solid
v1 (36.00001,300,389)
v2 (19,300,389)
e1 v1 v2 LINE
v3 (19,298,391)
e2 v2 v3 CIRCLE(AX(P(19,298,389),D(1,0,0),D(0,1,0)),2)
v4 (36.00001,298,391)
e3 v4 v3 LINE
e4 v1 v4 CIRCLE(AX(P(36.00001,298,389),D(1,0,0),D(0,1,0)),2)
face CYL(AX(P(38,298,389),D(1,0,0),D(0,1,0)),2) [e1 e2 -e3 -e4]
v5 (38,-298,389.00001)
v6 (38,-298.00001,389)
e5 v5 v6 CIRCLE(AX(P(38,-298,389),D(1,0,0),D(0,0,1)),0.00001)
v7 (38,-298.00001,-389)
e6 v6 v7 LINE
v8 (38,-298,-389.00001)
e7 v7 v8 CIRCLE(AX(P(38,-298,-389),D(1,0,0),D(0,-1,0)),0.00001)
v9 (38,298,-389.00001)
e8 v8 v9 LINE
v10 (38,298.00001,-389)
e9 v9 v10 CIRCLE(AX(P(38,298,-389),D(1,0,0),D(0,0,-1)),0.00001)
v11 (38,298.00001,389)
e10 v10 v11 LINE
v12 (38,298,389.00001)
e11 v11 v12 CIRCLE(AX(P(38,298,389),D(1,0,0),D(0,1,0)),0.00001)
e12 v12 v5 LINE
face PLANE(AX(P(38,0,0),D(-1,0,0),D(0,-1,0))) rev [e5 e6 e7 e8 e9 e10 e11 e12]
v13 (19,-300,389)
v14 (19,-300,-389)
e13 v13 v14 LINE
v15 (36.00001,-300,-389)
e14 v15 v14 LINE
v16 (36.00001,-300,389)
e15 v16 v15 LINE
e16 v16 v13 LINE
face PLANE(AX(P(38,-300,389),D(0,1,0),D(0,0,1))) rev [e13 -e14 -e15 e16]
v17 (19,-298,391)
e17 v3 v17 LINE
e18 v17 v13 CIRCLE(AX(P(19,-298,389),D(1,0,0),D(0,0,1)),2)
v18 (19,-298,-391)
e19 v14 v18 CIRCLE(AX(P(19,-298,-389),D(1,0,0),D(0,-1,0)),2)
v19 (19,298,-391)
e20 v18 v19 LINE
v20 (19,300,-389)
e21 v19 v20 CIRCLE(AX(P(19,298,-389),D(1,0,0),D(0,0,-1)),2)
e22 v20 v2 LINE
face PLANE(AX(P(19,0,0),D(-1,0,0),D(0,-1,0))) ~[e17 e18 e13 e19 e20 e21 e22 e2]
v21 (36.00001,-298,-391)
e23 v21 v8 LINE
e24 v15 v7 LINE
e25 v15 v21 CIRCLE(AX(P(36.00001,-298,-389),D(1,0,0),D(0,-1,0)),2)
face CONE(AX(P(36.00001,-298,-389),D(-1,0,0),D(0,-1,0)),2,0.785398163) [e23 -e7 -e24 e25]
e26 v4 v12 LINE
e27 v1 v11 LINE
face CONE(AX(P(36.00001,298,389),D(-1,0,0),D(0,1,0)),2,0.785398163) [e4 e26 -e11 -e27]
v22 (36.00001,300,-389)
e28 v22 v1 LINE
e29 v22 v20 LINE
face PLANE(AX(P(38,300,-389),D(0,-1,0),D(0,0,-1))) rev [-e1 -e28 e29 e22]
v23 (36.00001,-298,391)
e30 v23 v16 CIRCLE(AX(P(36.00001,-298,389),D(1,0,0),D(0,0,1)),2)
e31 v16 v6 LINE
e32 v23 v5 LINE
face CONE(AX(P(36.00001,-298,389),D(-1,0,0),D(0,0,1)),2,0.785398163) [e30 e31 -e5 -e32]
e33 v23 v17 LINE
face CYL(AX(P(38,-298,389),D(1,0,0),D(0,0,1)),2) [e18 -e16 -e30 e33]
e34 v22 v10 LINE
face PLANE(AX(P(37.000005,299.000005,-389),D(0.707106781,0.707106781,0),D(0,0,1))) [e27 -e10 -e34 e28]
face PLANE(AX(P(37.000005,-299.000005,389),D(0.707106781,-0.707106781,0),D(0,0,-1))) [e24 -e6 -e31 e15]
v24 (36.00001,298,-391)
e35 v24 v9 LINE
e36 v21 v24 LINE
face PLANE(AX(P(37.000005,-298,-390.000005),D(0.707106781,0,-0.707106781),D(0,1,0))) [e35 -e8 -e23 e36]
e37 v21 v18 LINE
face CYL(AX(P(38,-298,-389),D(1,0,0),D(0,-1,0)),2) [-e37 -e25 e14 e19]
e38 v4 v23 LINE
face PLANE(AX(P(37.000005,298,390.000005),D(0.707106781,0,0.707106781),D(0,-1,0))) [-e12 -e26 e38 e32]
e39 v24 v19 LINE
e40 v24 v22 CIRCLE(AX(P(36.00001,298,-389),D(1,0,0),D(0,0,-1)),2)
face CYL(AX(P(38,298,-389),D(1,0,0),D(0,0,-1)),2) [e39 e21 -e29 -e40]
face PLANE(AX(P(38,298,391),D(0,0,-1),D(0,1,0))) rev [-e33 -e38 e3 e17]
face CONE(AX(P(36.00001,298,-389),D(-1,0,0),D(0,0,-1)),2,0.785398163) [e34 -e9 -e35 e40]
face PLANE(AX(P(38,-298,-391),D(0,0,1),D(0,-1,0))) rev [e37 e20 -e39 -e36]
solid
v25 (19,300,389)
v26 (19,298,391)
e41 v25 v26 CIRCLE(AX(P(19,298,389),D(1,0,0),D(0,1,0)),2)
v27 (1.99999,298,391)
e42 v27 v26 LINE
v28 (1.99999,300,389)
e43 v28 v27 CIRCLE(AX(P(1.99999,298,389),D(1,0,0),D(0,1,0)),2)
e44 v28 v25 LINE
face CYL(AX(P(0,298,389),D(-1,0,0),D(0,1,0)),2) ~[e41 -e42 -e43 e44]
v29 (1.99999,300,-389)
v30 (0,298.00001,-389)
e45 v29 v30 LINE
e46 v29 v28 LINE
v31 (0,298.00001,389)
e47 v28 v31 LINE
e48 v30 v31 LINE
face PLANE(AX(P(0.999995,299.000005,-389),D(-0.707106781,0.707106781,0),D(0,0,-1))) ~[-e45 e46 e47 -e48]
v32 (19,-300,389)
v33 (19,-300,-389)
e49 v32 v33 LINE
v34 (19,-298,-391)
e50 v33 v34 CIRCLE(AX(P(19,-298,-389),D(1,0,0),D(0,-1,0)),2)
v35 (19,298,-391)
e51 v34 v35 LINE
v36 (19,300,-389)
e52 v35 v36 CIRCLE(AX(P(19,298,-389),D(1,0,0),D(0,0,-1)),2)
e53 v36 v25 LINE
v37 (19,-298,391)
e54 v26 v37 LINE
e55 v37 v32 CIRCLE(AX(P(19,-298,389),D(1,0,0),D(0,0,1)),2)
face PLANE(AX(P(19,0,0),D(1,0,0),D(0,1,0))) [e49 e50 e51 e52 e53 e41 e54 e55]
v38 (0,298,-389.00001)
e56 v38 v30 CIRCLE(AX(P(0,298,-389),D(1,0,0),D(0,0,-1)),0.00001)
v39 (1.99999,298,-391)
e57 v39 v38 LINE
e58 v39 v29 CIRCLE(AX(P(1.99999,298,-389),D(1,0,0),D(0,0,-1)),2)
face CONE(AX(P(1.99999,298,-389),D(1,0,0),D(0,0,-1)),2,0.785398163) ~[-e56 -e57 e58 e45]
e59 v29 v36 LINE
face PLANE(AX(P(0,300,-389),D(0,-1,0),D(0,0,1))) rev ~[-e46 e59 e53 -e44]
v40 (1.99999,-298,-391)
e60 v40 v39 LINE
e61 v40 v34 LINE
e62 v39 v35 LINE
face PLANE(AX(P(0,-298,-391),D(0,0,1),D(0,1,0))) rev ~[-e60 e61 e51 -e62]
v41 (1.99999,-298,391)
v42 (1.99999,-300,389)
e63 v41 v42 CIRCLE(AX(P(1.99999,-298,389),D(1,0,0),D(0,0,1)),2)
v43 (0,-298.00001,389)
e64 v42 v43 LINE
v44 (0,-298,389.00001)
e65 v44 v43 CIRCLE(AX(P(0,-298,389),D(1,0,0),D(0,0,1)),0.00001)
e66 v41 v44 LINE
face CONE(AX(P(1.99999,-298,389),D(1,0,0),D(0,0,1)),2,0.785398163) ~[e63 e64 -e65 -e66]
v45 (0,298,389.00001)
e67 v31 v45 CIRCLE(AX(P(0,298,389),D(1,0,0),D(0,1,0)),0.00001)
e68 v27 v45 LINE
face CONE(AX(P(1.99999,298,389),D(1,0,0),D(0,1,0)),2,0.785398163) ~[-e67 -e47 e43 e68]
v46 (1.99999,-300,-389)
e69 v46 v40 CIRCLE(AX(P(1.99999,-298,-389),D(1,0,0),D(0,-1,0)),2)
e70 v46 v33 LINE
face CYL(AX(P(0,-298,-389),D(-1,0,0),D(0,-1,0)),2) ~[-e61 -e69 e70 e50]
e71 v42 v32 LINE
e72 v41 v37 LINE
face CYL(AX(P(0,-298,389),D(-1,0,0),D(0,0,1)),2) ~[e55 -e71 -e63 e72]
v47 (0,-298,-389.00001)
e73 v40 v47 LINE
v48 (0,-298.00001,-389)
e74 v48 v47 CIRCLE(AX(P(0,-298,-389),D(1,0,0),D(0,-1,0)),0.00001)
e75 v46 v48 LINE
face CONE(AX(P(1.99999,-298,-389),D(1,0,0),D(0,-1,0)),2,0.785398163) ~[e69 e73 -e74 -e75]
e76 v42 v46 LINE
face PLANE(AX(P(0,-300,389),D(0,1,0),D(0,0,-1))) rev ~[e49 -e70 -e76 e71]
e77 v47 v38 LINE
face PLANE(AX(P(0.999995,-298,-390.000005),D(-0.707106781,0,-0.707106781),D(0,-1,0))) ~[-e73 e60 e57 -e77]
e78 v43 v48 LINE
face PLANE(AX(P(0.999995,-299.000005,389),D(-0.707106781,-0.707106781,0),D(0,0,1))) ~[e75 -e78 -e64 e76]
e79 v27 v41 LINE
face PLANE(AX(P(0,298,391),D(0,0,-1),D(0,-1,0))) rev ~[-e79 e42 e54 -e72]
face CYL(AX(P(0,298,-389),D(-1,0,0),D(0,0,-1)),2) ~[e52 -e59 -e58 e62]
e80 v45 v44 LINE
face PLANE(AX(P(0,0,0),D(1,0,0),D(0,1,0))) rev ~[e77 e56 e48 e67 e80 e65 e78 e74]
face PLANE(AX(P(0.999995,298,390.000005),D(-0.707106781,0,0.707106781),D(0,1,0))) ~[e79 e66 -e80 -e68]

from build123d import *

# Parameters (mm, degrees)
F1_DEPTH = 19
F2_SIZE2 = 1.99999
F2_SIZE  = 1.99999


# Not quite as in the source:
# - a fillet or chamfer is up to 0.001 mm smaller than in the source, because OpenCascade refuses the exact size


with BuildPart() as f1:
    # F0 (on Right) → F1 (new body)
    with BuildSketch(Plane.YZ):
        with BuildLine():
            Line((298, 391), (-298, 391))
            ThreePointArc((-298, 391), (-299.4142135624, 390.4142135624), (-300, 389))
            Line((-300, 389), (-300, -389))
            ThreePointArc((-300, -389), (-299.4142135624, -390.4142135624), (-298, -391))
            Line((-298, -391), (298, -391))
            ThreePointArc((298, -391), (299.4142135624, -390.4142135624), (300, -389))
            Line((300, -389), (300, 389))
            ThreePointArc((300, 389), (299.4142135624, 390.4142135624), (298, 391))
        make_face()
    extrude(amount=F1_DEPTH)

    # F2 (size 2 and 2 in the source; OpenCascade refuses exactly that, so slightly less here)
    f2_edges = [f1.edges().sort_by_distance(p)[0] for p in [
        (0, 0, 391),
        (0, -300, 0),
        (0, 0, -391),
        (0, 300, 0),
    ]]
    chamfer(f2_edges, length=F2_SIZE, length2=F2_SIZE2)


with BuildPart() as f3_1:
    # F3: instance of F1
    add(f1.part.mirror(Plane.YZ.offset(19)))


solid = Compound([f1.part, f3_1.part])
